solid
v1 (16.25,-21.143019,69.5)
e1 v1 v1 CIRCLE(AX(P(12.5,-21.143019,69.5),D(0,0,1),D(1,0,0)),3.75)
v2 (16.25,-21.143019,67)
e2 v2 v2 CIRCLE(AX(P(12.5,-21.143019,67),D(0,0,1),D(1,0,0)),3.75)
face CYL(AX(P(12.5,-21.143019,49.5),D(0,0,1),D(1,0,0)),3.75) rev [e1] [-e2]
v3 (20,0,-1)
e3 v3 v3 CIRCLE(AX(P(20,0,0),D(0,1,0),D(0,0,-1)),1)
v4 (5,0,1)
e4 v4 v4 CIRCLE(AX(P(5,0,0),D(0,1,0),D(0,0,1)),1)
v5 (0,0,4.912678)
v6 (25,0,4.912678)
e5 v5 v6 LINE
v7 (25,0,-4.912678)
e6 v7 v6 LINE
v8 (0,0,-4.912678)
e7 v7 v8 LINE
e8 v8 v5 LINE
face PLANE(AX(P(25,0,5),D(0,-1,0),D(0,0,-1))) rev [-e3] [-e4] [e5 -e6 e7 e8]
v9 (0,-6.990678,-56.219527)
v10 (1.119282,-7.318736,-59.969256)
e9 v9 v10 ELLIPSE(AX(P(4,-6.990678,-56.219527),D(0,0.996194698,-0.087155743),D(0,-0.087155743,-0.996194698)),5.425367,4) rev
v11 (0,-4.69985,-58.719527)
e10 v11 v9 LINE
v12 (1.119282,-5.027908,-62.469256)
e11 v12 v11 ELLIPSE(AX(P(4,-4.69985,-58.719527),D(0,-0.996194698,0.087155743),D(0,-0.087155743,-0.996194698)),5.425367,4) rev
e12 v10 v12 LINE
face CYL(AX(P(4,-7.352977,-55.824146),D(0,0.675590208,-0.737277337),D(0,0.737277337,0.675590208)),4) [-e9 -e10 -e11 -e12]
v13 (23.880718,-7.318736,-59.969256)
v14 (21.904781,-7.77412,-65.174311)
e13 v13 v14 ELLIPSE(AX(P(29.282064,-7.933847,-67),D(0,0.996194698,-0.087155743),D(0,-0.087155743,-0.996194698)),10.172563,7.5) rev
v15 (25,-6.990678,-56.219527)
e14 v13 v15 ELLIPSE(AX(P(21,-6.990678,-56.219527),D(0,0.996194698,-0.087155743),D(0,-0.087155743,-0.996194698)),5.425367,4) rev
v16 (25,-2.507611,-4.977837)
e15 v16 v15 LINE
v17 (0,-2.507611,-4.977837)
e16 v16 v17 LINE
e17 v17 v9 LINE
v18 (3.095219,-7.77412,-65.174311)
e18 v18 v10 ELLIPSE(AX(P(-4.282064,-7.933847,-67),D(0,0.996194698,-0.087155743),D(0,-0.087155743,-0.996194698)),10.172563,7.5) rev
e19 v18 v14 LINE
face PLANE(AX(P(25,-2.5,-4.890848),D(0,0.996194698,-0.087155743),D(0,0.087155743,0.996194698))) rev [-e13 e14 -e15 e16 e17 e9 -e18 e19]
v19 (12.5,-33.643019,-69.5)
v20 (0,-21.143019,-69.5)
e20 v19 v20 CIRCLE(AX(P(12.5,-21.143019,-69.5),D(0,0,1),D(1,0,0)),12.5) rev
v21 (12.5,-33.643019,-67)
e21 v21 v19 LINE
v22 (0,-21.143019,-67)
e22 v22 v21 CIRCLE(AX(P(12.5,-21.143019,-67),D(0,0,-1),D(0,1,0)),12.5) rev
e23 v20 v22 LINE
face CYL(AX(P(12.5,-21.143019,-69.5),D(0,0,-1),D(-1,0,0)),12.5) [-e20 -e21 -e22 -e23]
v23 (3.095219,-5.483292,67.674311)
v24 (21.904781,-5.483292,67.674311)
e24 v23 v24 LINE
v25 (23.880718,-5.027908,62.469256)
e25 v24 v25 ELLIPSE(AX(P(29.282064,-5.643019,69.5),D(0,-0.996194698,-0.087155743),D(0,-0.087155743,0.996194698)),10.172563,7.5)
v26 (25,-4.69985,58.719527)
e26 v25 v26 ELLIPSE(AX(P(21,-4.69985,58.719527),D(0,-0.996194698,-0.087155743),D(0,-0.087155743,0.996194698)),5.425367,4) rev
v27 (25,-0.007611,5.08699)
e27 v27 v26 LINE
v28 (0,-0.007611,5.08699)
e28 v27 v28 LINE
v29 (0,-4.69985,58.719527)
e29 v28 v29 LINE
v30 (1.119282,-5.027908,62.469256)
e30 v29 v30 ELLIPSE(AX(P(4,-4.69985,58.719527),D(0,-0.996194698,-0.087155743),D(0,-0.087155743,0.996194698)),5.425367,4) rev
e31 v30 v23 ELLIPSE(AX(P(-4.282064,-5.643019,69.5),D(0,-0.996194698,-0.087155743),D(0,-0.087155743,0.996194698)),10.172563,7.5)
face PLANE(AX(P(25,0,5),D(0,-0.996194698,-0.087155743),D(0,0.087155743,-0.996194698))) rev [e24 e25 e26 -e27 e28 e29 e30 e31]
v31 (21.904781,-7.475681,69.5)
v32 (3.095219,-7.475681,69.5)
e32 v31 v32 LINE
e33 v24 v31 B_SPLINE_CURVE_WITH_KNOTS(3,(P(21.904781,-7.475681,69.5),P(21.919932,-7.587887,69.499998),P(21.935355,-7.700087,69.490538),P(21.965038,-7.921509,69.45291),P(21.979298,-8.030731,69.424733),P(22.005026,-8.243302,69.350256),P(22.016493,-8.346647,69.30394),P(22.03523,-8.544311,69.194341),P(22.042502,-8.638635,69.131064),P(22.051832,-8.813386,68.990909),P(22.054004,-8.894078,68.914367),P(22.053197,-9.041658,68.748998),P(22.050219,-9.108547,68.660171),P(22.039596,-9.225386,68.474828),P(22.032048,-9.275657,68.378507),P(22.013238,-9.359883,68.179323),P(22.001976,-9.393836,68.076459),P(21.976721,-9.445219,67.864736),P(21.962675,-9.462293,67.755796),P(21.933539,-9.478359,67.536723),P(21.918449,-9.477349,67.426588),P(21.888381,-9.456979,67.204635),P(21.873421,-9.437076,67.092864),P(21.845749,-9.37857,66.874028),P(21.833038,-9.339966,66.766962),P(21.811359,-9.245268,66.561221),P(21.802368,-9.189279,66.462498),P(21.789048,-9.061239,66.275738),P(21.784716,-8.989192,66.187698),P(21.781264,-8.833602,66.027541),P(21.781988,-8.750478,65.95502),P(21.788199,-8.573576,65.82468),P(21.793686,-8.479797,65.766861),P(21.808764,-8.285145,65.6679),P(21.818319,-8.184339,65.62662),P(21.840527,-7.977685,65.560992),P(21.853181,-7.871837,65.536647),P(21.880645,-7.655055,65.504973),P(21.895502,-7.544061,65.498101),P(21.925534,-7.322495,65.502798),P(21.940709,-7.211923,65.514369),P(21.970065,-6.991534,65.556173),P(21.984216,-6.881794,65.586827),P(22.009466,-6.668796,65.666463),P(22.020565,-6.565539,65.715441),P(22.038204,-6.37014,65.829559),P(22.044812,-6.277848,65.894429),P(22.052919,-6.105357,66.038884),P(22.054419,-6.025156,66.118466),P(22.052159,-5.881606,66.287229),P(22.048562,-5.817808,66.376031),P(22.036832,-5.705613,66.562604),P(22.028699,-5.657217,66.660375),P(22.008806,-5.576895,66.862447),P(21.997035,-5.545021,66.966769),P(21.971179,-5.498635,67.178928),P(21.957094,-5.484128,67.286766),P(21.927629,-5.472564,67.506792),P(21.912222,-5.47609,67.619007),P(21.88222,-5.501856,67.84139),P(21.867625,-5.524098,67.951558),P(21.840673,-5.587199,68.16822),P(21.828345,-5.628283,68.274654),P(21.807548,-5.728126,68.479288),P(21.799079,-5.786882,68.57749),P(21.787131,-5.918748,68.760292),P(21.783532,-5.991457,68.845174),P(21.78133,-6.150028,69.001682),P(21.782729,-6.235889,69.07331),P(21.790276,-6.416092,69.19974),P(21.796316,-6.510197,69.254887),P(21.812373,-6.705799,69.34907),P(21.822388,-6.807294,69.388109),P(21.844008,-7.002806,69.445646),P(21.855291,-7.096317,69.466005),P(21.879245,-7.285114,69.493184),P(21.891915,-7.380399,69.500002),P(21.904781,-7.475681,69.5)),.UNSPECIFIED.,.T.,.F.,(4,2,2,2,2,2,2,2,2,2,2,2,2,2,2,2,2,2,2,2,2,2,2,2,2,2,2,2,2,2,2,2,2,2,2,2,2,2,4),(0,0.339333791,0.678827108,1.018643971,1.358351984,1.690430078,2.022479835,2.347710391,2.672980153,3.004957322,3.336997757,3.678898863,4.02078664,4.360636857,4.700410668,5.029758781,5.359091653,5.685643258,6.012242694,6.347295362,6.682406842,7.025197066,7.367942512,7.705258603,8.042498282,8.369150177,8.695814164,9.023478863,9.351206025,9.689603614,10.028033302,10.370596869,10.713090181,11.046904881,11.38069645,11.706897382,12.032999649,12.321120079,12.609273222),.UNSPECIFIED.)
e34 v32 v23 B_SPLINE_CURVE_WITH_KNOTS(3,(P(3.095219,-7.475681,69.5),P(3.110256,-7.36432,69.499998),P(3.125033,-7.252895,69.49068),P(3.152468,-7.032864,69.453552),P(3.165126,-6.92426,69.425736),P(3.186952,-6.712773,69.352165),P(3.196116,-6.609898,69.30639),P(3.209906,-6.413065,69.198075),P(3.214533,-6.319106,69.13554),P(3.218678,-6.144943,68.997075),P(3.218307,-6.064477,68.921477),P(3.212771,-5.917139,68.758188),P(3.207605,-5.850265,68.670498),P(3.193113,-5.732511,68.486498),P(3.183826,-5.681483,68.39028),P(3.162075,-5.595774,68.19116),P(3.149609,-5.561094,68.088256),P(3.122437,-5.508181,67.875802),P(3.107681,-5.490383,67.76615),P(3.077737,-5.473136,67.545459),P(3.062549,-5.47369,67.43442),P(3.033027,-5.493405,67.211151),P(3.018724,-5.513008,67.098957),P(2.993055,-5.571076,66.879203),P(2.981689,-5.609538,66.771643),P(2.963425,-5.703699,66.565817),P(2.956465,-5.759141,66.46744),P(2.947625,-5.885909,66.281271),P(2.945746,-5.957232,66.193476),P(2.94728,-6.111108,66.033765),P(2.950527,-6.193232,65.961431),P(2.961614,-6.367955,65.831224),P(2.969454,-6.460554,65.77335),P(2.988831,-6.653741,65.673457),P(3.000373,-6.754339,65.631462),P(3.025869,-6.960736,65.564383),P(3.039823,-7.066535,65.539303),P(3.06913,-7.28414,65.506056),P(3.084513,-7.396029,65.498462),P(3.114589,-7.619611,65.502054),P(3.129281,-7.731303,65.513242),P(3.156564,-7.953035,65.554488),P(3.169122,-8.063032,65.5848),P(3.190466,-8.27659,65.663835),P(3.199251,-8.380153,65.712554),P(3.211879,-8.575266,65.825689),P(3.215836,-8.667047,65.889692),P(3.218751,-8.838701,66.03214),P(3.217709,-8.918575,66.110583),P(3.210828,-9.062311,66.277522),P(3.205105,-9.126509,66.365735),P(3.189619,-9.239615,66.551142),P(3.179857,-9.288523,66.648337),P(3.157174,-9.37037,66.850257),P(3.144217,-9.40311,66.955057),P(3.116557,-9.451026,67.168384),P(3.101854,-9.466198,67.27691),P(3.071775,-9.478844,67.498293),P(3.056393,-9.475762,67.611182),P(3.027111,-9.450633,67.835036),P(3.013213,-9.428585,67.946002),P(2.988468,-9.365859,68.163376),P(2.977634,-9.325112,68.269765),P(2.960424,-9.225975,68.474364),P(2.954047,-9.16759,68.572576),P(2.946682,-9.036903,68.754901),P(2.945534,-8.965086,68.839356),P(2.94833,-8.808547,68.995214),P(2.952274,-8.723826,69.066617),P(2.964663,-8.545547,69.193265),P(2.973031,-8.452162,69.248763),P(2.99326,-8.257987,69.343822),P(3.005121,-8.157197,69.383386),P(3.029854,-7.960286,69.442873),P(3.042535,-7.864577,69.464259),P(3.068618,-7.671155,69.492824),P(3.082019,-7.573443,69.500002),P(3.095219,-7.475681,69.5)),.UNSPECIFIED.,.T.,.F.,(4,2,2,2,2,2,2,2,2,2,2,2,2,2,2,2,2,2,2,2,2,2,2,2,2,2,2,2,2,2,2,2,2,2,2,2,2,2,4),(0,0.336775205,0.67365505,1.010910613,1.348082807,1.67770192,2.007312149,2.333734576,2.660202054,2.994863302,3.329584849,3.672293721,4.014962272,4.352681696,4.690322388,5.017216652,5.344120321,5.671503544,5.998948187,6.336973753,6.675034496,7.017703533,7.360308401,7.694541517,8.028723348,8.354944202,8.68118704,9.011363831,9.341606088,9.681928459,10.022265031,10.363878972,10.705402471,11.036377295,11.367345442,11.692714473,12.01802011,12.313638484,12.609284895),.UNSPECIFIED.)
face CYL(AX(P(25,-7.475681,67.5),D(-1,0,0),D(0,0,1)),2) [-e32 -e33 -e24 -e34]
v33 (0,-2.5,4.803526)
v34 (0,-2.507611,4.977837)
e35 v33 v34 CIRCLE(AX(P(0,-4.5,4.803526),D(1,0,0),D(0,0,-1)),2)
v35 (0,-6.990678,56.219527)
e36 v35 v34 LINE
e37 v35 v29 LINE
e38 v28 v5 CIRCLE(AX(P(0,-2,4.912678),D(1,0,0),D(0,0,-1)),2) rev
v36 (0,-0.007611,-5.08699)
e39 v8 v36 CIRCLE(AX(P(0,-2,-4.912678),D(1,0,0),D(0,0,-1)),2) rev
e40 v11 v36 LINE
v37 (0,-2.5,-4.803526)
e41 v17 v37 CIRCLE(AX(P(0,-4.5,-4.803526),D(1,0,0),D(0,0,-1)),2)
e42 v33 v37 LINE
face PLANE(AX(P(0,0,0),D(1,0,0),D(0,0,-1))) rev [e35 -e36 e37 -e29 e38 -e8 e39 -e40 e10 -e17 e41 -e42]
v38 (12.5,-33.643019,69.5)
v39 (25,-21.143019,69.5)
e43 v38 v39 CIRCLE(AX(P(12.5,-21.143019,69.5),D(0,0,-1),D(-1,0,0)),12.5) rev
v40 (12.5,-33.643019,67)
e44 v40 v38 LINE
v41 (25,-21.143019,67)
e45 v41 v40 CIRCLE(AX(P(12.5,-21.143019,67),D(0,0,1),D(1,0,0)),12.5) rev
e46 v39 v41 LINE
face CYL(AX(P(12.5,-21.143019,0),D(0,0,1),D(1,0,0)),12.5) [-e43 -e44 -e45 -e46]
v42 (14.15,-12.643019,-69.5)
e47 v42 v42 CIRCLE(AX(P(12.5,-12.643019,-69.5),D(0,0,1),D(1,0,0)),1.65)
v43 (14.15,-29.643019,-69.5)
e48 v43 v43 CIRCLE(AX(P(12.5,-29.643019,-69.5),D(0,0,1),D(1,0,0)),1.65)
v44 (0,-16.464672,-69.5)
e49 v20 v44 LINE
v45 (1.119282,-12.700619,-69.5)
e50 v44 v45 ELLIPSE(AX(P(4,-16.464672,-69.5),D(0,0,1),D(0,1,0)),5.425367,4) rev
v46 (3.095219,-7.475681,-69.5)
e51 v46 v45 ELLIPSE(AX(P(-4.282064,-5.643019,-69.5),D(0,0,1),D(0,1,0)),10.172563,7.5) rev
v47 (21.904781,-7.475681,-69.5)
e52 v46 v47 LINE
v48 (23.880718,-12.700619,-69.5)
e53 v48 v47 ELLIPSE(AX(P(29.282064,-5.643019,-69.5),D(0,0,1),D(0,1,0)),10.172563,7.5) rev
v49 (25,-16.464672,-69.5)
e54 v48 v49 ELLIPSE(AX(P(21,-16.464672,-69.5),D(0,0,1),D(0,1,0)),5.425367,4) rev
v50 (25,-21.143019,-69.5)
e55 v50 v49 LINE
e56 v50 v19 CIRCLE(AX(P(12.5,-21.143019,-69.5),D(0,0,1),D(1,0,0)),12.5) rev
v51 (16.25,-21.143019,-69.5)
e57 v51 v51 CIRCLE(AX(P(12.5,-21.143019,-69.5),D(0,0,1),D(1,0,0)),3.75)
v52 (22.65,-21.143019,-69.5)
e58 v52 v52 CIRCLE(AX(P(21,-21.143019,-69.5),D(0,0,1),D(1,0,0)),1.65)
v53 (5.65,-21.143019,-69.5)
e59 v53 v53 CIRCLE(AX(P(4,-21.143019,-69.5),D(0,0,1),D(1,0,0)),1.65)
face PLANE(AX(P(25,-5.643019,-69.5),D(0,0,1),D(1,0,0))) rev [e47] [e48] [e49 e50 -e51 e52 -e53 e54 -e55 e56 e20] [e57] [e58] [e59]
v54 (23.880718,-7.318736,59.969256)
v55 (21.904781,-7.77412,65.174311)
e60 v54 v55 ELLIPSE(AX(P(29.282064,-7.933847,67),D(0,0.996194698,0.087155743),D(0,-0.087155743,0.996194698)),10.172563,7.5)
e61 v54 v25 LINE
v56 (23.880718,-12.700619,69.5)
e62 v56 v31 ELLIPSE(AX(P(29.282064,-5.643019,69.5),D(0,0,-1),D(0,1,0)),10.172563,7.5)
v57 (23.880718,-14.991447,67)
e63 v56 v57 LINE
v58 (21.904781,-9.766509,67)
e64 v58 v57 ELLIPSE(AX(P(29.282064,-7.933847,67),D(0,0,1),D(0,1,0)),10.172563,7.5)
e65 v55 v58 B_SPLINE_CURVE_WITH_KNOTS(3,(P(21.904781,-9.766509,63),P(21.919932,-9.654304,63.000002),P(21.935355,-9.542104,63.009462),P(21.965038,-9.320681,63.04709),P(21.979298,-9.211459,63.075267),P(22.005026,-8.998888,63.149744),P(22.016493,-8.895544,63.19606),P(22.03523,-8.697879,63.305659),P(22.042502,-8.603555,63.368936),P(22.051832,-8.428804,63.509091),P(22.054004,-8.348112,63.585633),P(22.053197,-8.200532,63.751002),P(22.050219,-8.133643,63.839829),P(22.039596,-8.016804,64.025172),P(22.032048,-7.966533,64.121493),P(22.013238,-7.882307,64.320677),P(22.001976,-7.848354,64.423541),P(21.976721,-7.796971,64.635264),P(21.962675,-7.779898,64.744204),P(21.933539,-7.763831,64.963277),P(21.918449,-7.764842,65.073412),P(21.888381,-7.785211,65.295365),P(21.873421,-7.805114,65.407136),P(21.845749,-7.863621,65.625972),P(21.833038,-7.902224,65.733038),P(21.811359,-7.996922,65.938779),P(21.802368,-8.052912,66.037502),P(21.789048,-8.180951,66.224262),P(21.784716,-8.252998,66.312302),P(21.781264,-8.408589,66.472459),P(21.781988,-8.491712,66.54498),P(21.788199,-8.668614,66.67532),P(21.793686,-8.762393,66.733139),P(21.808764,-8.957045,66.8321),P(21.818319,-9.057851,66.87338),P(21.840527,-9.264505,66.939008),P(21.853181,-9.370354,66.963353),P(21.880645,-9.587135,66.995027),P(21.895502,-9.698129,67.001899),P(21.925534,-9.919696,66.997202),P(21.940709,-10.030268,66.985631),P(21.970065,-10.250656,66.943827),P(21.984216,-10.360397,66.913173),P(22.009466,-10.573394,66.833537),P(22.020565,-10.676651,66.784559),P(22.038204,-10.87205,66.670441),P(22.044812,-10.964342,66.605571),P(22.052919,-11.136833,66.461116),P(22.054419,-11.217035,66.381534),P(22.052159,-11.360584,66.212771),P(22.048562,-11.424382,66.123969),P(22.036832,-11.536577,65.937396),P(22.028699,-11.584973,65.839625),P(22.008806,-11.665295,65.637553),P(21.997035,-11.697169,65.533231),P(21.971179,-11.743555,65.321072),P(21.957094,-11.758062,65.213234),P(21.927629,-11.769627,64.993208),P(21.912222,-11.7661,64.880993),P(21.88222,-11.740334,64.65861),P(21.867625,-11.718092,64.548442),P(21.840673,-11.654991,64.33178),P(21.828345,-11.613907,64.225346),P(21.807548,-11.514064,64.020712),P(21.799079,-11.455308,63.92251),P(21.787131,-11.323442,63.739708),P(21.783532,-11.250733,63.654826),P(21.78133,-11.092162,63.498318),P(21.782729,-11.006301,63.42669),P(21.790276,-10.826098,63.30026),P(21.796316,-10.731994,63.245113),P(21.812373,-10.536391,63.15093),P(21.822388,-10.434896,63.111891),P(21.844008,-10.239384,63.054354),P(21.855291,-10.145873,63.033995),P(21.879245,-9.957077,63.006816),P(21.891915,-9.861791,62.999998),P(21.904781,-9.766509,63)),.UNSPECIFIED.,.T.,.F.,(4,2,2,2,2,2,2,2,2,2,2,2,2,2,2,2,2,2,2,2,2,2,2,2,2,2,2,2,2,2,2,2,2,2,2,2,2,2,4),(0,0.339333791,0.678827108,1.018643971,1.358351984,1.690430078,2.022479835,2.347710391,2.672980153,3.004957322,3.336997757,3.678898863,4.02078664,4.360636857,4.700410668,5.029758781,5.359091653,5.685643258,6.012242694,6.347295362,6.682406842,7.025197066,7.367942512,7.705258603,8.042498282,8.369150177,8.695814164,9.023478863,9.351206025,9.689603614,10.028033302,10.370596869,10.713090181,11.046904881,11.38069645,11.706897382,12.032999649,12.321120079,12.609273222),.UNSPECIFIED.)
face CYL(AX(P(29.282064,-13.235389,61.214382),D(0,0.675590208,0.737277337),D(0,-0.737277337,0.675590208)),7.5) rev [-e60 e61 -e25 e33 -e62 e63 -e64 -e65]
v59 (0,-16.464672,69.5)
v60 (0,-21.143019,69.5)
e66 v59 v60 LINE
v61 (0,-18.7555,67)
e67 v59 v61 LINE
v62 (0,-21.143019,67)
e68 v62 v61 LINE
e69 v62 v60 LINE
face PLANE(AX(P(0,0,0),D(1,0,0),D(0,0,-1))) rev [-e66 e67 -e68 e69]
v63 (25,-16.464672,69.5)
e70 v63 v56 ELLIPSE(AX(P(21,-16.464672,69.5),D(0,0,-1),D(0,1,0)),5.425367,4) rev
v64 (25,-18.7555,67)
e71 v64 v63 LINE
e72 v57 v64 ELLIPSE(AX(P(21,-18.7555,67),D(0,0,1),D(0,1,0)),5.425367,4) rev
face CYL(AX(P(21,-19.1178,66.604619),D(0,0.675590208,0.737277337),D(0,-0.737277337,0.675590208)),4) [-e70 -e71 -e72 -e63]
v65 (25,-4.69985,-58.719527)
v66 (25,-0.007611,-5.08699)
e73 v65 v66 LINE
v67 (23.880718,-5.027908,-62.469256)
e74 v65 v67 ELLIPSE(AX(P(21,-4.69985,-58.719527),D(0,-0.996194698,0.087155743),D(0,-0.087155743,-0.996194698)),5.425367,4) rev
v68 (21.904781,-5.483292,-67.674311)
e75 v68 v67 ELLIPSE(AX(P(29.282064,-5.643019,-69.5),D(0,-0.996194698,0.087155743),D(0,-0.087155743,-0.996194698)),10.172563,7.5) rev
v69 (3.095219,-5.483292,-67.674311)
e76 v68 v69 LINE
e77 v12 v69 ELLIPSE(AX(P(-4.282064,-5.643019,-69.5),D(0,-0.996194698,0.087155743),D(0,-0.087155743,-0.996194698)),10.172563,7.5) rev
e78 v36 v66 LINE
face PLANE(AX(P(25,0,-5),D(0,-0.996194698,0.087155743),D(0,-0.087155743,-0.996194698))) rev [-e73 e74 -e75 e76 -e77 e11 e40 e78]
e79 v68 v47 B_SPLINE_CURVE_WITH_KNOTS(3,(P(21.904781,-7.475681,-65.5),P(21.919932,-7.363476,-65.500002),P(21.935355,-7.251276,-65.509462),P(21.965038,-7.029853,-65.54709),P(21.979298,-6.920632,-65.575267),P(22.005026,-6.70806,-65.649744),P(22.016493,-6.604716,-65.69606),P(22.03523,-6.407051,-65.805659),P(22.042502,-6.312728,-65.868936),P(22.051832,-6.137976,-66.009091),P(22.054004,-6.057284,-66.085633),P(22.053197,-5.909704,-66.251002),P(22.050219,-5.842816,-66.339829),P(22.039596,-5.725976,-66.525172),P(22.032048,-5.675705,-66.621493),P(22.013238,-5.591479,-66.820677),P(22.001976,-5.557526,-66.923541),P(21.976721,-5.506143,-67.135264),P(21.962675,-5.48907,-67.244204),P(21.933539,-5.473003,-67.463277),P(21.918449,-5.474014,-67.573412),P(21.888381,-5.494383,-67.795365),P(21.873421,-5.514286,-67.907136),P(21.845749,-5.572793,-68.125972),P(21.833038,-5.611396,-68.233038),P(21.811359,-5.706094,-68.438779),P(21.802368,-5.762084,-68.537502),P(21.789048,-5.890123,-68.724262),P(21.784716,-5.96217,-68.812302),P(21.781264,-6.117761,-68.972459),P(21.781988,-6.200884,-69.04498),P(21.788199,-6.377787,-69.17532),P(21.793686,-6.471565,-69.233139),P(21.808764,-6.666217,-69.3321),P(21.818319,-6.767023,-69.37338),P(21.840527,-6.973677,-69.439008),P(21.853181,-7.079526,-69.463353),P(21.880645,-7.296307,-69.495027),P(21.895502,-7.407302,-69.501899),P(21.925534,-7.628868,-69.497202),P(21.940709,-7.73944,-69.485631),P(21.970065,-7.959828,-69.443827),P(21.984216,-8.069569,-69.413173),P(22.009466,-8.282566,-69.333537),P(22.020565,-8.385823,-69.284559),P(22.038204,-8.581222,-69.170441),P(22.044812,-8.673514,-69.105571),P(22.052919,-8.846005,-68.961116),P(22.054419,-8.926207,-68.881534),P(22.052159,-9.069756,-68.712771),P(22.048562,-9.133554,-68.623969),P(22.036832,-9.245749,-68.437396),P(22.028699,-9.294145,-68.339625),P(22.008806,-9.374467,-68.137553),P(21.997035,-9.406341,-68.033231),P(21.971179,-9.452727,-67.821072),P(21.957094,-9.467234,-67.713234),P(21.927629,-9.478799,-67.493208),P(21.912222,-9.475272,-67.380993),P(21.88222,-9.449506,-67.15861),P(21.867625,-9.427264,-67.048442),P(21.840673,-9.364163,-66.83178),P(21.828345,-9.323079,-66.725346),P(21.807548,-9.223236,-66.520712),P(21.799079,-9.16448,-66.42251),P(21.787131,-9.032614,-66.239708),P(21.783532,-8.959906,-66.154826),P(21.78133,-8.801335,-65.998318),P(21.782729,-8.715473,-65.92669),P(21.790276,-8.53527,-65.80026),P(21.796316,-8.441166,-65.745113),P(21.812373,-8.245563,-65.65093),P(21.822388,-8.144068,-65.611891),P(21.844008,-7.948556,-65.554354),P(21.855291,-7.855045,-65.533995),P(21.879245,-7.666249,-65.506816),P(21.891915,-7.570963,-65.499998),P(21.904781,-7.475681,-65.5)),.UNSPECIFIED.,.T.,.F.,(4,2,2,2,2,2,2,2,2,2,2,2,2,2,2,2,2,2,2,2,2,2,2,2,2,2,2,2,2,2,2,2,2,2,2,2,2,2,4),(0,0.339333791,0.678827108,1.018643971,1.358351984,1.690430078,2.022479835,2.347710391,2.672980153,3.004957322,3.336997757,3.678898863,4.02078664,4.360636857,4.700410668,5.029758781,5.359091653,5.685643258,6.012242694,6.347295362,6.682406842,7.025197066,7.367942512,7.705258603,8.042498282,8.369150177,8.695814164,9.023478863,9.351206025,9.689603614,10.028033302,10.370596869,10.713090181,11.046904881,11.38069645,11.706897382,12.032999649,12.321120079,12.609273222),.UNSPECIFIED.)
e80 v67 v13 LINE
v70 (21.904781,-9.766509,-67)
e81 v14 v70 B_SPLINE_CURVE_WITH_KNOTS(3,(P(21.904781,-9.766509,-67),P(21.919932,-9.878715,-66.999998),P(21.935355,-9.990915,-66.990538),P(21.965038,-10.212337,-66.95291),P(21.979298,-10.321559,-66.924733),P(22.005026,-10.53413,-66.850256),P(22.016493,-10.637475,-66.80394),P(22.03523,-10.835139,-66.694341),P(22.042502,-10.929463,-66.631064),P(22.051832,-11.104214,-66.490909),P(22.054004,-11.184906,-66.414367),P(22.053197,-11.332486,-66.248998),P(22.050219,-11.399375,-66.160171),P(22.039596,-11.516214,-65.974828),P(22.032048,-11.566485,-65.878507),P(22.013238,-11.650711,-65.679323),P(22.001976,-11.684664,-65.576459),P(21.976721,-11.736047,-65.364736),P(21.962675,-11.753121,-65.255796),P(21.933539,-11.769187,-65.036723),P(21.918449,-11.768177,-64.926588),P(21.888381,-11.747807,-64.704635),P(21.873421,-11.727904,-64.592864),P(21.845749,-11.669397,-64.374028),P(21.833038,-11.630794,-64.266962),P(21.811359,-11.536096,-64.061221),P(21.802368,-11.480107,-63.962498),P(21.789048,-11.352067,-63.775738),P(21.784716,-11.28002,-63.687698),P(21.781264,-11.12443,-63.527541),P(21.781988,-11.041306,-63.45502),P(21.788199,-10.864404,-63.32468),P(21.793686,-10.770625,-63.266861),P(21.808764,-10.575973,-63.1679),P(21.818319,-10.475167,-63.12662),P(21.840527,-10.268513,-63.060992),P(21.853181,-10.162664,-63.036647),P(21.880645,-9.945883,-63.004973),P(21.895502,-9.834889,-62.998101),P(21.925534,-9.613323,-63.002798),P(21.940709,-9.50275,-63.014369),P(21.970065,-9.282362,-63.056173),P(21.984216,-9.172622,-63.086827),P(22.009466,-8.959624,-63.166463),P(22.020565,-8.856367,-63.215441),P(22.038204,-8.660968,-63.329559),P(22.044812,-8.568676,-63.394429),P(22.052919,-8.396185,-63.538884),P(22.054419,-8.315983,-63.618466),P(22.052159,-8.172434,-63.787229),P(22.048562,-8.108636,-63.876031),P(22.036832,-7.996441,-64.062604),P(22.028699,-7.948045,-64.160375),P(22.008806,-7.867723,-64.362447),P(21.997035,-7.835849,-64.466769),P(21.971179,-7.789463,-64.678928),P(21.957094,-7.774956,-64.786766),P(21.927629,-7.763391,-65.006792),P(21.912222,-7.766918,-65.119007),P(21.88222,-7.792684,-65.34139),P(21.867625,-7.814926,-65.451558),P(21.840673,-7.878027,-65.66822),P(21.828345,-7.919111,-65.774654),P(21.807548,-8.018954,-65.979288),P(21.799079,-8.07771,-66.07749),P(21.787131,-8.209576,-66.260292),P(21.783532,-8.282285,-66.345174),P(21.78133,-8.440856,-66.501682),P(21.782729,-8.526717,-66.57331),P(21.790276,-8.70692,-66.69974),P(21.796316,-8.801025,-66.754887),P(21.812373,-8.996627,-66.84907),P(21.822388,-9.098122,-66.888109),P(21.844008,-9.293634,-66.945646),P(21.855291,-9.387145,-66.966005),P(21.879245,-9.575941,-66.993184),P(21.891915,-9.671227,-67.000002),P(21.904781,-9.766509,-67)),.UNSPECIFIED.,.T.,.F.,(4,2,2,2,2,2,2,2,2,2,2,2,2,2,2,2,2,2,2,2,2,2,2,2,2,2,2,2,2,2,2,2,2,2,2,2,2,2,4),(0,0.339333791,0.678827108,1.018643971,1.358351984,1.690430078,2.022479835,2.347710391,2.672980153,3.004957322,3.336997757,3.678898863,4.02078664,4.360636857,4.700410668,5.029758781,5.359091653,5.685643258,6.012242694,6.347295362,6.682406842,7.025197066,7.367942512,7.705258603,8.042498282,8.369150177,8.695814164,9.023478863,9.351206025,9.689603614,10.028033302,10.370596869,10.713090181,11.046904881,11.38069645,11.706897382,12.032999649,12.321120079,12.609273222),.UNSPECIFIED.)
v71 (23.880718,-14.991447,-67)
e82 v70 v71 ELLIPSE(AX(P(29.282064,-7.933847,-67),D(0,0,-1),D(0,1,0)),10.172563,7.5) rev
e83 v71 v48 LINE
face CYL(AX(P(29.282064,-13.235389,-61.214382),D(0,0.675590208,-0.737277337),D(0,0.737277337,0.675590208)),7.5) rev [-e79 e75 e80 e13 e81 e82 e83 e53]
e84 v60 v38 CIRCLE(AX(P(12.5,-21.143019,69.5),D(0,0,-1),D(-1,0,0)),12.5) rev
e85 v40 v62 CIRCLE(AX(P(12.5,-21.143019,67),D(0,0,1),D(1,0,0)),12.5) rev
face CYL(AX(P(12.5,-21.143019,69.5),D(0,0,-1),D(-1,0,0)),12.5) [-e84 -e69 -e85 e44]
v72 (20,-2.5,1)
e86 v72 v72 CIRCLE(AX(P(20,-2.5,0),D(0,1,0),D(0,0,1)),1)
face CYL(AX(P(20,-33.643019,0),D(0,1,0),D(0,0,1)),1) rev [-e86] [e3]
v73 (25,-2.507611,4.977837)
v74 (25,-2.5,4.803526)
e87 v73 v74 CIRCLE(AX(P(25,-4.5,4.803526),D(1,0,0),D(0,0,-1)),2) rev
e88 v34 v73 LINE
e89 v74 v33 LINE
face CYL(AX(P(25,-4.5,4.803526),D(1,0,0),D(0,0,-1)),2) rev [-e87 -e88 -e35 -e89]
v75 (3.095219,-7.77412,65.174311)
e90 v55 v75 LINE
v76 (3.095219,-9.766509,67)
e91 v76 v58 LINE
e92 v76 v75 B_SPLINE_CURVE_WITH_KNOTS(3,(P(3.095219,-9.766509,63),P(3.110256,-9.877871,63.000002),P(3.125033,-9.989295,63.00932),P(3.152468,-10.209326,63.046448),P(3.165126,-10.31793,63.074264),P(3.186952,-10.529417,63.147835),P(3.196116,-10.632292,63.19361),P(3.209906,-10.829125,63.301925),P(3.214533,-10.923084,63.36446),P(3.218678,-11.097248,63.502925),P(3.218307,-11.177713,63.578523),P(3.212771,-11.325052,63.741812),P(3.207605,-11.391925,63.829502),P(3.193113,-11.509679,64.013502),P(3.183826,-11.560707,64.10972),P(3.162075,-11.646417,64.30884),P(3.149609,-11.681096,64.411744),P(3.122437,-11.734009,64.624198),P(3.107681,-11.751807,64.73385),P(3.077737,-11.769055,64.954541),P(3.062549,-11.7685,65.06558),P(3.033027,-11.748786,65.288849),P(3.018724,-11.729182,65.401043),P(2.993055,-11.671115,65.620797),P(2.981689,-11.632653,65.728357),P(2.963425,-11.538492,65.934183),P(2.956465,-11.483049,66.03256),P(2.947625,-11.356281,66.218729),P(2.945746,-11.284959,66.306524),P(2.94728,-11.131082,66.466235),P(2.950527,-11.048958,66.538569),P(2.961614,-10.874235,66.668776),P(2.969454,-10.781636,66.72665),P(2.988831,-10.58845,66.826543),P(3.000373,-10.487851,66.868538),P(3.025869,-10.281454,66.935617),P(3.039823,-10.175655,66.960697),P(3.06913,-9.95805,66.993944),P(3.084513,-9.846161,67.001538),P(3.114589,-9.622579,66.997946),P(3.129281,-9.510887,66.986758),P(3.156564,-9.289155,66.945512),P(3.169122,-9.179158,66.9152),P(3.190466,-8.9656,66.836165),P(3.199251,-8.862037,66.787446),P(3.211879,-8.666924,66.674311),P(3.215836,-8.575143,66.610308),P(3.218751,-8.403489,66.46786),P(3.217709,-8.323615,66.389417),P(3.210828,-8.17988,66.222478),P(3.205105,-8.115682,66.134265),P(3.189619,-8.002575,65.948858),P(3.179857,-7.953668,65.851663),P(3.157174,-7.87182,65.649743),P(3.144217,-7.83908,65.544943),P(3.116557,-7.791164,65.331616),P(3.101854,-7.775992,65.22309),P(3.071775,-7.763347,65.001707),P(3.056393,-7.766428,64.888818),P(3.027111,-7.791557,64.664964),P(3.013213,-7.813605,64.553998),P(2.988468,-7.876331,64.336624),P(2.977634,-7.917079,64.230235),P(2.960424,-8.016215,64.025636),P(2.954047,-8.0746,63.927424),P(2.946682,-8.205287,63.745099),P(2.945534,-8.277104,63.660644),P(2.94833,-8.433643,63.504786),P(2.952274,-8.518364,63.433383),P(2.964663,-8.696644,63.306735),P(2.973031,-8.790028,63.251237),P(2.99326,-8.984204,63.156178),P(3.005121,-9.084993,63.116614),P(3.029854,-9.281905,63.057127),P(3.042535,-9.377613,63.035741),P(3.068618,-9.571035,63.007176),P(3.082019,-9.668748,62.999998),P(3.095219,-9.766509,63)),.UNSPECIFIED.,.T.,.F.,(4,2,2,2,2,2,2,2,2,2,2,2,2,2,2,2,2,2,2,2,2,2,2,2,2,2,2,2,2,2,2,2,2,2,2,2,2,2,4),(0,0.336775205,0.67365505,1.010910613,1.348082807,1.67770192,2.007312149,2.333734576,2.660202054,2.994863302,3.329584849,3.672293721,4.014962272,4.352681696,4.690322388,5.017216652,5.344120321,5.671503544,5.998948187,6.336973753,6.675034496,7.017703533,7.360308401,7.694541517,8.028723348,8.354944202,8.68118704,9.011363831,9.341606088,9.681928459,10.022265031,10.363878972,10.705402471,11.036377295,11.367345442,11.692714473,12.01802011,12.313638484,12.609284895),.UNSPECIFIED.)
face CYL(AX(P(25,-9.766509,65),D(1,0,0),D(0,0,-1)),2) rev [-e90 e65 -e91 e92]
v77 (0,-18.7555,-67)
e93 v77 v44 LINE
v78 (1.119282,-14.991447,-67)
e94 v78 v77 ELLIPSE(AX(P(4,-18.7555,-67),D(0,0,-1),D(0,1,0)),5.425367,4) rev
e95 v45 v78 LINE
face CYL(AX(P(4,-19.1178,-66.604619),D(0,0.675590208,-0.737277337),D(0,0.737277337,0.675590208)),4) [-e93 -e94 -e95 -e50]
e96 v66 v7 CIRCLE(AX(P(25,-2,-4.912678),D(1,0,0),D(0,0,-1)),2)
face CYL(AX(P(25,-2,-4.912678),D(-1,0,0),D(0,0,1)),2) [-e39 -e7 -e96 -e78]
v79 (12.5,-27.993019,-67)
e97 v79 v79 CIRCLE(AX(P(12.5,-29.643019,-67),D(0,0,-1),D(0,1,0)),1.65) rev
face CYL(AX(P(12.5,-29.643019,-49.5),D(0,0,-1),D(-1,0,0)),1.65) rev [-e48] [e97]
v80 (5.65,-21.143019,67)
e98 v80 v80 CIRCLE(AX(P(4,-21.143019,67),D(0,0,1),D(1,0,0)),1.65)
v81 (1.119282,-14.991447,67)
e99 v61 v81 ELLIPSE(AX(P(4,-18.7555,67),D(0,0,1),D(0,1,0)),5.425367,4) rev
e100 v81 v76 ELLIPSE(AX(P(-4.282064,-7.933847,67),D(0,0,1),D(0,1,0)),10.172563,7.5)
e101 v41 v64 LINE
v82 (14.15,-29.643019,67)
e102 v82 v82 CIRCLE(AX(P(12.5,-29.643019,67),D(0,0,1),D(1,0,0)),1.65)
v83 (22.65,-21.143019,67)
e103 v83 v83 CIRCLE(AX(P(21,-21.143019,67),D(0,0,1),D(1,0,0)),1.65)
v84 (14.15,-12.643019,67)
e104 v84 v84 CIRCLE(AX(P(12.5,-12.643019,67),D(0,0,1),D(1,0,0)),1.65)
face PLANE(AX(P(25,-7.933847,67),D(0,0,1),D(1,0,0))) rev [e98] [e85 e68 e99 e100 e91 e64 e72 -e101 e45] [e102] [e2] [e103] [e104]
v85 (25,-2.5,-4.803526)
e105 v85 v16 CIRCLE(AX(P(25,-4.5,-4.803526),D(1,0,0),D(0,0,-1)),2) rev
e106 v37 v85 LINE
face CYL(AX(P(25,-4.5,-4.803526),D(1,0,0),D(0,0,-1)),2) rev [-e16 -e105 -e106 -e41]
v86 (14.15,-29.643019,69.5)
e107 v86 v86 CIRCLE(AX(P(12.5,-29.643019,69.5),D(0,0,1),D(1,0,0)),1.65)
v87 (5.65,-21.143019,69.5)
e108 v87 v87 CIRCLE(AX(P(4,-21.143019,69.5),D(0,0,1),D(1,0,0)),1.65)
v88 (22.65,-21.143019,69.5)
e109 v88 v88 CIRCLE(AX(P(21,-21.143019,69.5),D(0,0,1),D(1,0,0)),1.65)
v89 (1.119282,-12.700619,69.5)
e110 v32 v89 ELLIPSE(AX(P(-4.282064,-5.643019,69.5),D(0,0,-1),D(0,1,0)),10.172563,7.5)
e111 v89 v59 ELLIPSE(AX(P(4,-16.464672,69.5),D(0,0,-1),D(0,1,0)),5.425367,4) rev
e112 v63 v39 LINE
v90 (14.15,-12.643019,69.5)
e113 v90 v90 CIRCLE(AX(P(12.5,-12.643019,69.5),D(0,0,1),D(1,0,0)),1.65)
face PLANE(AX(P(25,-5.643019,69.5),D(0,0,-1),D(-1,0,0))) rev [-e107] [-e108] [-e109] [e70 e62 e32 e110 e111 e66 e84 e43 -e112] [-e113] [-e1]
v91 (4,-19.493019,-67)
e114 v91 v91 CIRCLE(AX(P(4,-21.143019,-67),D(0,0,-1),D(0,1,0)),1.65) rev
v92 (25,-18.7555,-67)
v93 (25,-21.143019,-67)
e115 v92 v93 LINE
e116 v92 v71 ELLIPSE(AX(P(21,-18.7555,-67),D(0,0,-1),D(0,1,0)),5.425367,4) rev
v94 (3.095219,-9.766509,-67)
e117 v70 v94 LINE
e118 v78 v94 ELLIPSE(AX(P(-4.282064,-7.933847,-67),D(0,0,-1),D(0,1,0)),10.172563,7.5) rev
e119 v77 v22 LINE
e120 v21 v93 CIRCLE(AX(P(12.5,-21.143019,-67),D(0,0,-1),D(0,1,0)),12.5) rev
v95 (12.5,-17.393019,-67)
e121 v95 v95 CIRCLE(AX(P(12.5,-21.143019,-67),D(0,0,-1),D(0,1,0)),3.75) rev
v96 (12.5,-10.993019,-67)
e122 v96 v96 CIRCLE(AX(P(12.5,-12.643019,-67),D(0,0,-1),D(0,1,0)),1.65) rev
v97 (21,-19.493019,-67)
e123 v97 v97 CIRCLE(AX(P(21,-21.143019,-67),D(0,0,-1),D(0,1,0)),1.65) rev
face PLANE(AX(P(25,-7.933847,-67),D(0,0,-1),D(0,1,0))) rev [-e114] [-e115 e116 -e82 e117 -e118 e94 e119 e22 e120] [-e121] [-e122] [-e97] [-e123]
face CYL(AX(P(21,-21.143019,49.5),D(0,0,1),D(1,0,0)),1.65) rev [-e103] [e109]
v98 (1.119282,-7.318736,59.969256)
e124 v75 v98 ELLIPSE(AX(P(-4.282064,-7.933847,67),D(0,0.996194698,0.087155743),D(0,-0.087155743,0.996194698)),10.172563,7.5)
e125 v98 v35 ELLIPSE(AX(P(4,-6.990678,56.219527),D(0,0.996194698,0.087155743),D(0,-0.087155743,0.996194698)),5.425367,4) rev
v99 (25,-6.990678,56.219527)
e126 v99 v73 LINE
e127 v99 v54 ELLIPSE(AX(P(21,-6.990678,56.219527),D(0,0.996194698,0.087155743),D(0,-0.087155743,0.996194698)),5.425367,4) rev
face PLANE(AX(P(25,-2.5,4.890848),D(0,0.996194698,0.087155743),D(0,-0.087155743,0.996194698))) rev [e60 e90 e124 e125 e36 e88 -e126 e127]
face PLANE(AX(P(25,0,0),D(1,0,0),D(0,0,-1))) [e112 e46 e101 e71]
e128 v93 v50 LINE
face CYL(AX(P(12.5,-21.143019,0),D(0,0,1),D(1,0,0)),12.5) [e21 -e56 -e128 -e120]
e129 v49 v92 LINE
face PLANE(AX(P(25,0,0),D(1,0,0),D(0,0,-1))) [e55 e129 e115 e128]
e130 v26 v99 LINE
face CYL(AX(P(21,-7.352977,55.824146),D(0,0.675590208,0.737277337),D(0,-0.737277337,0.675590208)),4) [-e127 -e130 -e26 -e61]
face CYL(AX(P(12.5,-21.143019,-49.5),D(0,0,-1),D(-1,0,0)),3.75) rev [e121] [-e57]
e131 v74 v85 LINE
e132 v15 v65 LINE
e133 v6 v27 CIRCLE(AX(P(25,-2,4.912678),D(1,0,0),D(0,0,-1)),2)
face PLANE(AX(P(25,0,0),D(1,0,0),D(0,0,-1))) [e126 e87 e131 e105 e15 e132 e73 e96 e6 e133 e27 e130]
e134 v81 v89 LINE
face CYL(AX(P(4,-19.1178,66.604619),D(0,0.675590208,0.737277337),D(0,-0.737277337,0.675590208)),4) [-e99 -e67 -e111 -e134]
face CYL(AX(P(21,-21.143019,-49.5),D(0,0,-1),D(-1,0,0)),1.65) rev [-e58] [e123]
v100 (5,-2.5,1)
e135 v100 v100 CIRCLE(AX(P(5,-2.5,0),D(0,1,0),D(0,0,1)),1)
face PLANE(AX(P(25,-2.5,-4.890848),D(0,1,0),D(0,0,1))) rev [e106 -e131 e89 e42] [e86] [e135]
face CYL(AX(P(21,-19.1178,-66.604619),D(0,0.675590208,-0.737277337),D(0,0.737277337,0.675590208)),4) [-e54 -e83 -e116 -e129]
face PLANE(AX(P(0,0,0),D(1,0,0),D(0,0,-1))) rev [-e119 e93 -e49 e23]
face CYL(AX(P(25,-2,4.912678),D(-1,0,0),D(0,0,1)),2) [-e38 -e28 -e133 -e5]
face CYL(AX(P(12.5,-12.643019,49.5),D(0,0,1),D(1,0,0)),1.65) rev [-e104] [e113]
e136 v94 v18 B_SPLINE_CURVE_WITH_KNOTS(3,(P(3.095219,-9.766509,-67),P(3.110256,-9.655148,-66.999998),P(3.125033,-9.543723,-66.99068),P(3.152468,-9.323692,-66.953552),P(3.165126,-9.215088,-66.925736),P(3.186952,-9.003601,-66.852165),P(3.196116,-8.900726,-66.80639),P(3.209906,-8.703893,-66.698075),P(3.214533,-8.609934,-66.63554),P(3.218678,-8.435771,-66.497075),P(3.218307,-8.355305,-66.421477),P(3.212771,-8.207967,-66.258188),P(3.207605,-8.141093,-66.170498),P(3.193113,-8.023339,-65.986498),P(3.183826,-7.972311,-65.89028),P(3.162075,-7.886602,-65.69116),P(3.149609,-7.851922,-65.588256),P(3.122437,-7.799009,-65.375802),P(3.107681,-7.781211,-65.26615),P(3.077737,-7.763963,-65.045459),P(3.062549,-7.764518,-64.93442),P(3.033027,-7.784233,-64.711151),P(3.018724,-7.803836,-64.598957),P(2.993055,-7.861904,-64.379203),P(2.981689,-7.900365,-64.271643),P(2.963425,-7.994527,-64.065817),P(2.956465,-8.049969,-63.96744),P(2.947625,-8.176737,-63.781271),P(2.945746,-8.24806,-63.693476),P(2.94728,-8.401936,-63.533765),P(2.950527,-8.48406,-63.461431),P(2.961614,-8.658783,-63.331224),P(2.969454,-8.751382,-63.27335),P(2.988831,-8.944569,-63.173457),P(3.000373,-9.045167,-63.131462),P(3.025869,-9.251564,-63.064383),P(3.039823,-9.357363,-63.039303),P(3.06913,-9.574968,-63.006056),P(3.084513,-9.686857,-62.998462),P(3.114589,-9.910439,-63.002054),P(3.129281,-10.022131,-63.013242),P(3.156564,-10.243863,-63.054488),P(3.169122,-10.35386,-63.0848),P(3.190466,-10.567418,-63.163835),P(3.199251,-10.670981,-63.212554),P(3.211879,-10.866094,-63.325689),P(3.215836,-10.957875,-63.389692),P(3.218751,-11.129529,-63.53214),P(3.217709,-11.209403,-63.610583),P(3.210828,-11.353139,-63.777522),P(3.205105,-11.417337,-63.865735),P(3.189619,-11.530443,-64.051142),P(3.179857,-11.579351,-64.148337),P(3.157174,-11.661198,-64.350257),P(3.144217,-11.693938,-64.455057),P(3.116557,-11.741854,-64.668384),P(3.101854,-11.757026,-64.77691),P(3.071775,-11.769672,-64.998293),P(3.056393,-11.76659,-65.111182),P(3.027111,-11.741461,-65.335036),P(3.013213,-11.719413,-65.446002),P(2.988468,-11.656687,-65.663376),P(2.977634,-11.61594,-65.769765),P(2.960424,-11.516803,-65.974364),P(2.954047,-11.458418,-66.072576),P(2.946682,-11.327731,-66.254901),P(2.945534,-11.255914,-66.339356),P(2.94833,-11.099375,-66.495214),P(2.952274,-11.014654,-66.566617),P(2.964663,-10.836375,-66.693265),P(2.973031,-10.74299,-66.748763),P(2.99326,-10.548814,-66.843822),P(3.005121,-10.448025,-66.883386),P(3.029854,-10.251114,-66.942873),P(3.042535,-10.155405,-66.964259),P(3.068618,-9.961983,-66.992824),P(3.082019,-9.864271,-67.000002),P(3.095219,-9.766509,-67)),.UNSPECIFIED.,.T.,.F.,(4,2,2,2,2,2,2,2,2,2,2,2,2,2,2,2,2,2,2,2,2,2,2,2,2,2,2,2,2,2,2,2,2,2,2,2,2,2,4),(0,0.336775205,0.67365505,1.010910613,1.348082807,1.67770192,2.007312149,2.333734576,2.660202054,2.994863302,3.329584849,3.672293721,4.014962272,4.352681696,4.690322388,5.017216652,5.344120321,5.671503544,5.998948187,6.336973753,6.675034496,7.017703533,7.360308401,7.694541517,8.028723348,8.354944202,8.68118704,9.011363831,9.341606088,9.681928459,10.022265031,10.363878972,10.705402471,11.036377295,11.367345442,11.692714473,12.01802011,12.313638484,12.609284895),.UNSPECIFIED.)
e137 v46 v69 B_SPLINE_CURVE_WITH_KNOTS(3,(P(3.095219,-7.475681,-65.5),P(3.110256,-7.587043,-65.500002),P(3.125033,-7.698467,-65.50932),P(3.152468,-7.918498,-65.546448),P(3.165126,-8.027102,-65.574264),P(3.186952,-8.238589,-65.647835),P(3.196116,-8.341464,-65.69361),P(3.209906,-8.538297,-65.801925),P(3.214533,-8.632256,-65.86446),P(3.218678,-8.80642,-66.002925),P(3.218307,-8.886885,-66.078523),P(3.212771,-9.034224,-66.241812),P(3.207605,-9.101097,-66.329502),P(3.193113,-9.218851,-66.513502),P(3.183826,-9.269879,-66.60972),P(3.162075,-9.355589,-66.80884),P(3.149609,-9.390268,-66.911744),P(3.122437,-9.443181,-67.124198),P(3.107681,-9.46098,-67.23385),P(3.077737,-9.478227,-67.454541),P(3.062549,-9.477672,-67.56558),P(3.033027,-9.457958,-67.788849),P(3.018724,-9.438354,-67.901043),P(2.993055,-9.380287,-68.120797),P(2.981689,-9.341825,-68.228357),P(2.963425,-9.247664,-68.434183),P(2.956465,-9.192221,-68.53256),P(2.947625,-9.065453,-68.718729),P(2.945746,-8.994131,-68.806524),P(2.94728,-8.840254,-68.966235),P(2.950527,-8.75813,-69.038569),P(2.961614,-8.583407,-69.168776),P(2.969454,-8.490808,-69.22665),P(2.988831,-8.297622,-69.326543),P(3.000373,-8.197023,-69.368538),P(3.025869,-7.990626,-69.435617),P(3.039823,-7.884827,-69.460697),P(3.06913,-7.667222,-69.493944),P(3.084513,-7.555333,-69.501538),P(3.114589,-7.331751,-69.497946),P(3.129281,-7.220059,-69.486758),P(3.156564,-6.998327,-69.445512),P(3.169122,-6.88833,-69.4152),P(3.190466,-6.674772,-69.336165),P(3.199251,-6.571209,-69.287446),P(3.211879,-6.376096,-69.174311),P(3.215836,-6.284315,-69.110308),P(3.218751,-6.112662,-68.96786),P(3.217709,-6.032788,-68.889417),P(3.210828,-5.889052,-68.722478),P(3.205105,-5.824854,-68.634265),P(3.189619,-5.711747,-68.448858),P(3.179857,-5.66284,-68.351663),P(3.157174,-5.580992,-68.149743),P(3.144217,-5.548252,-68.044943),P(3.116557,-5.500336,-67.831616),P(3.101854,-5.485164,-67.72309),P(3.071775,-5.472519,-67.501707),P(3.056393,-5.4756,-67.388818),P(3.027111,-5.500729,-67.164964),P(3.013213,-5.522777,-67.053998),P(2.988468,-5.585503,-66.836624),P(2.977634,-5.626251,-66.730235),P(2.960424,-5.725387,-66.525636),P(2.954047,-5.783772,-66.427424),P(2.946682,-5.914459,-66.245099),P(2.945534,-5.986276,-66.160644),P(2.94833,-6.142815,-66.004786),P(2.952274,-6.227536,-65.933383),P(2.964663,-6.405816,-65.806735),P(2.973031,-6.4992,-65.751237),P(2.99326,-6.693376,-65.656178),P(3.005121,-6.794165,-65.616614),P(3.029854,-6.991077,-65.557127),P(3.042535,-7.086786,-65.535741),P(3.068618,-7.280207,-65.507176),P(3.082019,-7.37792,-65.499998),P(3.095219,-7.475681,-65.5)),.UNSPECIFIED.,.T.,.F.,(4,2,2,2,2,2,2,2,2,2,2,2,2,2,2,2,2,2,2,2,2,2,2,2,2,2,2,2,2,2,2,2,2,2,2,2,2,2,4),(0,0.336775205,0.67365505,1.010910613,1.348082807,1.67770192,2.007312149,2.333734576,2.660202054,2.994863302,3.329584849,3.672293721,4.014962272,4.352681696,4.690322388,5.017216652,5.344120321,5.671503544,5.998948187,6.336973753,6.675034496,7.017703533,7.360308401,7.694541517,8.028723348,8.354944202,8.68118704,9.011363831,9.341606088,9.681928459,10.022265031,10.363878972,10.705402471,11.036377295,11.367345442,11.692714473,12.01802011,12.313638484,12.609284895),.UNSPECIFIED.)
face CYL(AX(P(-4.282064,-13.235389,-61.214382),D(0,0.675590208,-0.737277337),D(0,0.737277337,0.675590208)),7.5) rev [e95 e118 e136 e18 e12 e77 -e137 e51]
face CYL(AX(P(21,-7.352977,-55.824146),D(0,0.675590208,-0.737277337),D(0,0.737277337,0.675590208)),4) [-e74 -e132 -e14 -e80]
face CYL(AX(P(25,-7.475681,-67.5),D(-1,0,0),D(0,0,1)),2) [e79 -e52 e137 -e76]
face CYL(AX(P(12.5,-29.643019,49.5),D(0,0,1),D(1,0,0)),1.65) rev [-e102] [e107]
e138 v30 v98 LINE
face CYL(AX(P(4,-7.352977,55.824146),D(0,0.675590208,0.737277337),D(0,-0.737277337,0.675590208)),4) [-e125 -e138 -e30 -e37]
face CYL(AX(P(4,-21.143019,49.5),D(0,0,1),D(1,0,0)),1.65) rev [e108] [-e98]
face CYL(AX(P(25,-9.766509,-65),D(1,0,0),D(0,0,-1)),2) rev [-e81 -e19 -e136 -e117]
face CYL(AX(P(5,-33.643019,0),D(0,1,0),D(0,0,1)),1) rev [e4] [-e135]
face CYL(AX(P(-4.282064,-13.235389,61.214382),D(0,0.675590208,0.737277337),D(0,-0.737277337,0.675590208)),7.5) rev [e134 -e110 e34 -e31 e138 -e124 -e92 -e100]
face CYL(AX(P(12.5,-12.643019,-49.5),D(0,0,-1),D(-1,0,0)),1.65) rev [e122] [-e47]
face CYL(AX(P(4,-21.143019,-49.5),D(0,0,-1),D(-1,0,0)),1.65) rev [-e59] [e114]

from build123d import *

# Parameters (mm, degrees)
RESSALTO_EXTRUS_O2_DEPTH = 25
ESBO_O9_R                = 3.75
ESBO_O9_R_2              = 1.65
CORTE_EXTRUS_O1_DEPTH    = 20
FILETE1_R                = 12.5
FILETE2_START            = -1
FILETE2_DEPTH            = 27
FILETE2_2_DEPTH          = 25
ESBO_O10_R               = 1
CORTE_EXTRUS_O2_DEPTH    = 82.160967921
ESBO_O11_R               = 7.5
CORTE_EXTRUS_O3_DEPTH    = 10
FILETE3_R                = 4


with BuildPart() as part:
    # Esboço2 → Ressalto-extrusão2 (new body)
    with BuildSketch(Plane(origin=(0, 0, 0), x_dir=(0, 0, -1), z_dir=(1, 0, 0))):
        Polygon((-5, 0), (0, 0), (5, 0), (69.5, -5.643018797), (69.5, -33.643018797), (67, -33.643018797), (67, -7.933846732), (4.890847643, -2.5), (0, -2.5), (-4.890847643, -2.5), (-67, -7.933846732), (-67, -33.643018797), (-69.5, -33.643018797), (-69.5, -5.643018797), align=None)
    extrude(amount=RESSALTO_EXTRUS_O2_DEPTH)

    # Esboço9 → Corte-extrusão1 (cut)
    with BuildSketch(Plane.XY.offset(69.5)):
        with Locations((12.5, -21.143018797)):
            Circle(ESBO_O9_R)
        with Locations((12.5, -12.643018797)):
            Circle(ESBO_O9_R_2)
        with Locations((21, -21.143018797)):
            Circle(ESBO_O9_R_2)
        with Locations((12.5, -29.643018797)):
            Circle(ESBO_O9_R_2)
        with Locations((4, -21.143018797)):
            Circle(ESBO_O9_R_2)
    corte_extrus_o1 = extrude(amount=-CORTE_EXTRUS_O1_DEPTH, mode=Mode.SUBTRACT)

    # Espelhar1: Corte-extrusão1 across plane
    add(corte_extrus_o1.mirror(Plane.XY), mode=Mode.SUBTRACT)

    # Filete1
    filete1_edges = [part.edges().sort_by_distance(p)[0] for p in [
        (0, -33.643018797, 68.25),
        (25, -33.643018797, 68.25),
        (25, -33.643018797, -68.25),
        (0, -33.643018797, -68.25),
    ]]
    fillet(filete1_edges, radius=FILETE1_R - 0.0001)  # a hair under: the kernel refuses the full size

    # Filete2: read off the stored shape, not the designer's step
    # Filete2 outline → Filete2 (cut)
    with BuildSketch(Plane.YZ.offset(FILETE2_START)):
        with BuildLine():
            Line((0, -5), (0, -4.912678114))
            ThreePointArc((0, -4.912678114), (-0.001903557, -4.999916889), (-0.007610604, -5.0869896))
            Line((-0.007610604, -5.0869896), (0, -5))
        make_face()
        with BuildLine():
            ThreePointArc((-7.475681145, 69.5), (-6.12450073, 68.974554674), (-5.483291749, 67.674311485))
            Line((-5.483291749, 67.674311485), (-5.643018797, 69.5))
            Line((-5.643018797, 69.5), (-7.475681145, 69.5))
        make_face()
        with BuildLine():
            ThreePointArc((-0.007610604, 5.0869896), (-0.001903557, 4.999916889), (0, 4.912678114))
            Line((0, 4.912678114), (0, 5))
            Line((0, 5), (-0.007610604, 5.0869896))
        make_face()
        with BuildLine():
            Line((-5.643018797, -69.5), (-5.483291749, -67.674311485))
            ThreePointArc((-5.483291749, -67.674311485), (-6.12450073, -68.974554674), (-7.475681145, -69.5))
            Line((-7.475681145, -69.5), (-5.643018797, -69.5))
        make_face()
    extrude(amount=FILETE2_DEPTH, mode=Mode.SUBTRACT)

    # Filete2 2 outline → Filete2 2 (add)
    with BuildSketch(Plane.YZ):
        with BuildLine():
            ThreePointArc((-9.766509081, 67), (-8.415328665, 66.474554674), (-7.774119684, 65.174311485))
            Line((-7.774119684, 65.174311485), (-7.933846732, 67))
            Line((-7.933846732, 67), (-9.766509081, 67))
        make_face()
        with BuildLine():
            ThreePointArc((-2.507610604, 4.977837242), (-2.501903557, 4.890764531), (-2.5, 4.803525757))
            Line((-2.5, 4.803525757), (-2.5, 4.890847643))
            Line((-2.5, 4.890847643), (-2.507610604, 4.977837242))
        make_face()
        with BuildLine():
            Line((-7.933846732, -67), (-7.774119684, -65.174311485))
            ThreePointArc((-7.774119684, -65.174311485), (-8.415328665, -66.474554674), (-9.766509081, -67))
            Line((-9.766509081, -67), (-7.933846732, -67))
        make_face()
        with BuildLine():
            ThreePointArc((-2.5, -4.803525757), (-2.501903557, -4.890764531), (-2.507610604, -4.977837242))
            Line((-2.507610604, -4.977837242), (-2.5, -4.890847643))
            Line((-2.5, -4.890847643), (-2.5, -4.803525757))
        make_face()
    extrude(amount=FILETE2_2_DEPTH)

    # Esboço10 → Corte-extrusão2 (cut, through all)
    with BuildSketch(Plane(origin=(0, 0, 0), x_dir=(1, 0, 0), z_dir=(0, 1, 0))):
        with Locations(Location((5, 0, 0), (0, 0, 270))):
            Circle(ESBO_O10_R)
        with Locations(Location((20, 0, 0), (0, 0, 270))):
            Circle(ESBO_O10_R)
    extrude(amount=-CORTE_EXTRUS_O2_DEPTH, mode=Mode.SUBTRACT)

    # Esboço11 → Corte-extrusão3 (cut, symmetric)
    with BuildSketch(Plane(origin=(0, 31.205699457, -34.0550451), x_dir=(1, 0, 0), z_dir=(0, -0.6755902076156625, 0.7372773368101221))):
        with Locations((-4.282064203, -51.1139893)):
            Circle(ESBO_O11_R)
        with Locations((29.282064203, -51.1139893)):
            Circle(ESBO_O11_R)
    corte_extrus_o3 = extrude(amount=CORTE_EXTRUS_O3_DEPTH, both=True, mode=Mode.SUBTRACT)

    # Espelhar2: Corte-extrusão3 across plane
    add(corte_extrus_o3.mirror(Plane.XY), mode=Mode.SUBTRACT)

    # Filete3
    filete3_edges = [part.edges().sort_by_distance(p)[0] for p in [
        (25, -15.140009882, -68.25),
        (25, -6.060544858, -59.930203155),
        (0, -6.060544858, -59.930203155),
        (0, -15.140009882, -68.25),
        (0, -15.140009882, 68.25),
        (0, -6.060544858, 59.930203155),
        (25, -15.140009882, 68.25),
        (25, -6.060544858, 59.930203155),
    ]]
    fillet(filete3_edges, radius=FILETE3_R)


solid = part.part
